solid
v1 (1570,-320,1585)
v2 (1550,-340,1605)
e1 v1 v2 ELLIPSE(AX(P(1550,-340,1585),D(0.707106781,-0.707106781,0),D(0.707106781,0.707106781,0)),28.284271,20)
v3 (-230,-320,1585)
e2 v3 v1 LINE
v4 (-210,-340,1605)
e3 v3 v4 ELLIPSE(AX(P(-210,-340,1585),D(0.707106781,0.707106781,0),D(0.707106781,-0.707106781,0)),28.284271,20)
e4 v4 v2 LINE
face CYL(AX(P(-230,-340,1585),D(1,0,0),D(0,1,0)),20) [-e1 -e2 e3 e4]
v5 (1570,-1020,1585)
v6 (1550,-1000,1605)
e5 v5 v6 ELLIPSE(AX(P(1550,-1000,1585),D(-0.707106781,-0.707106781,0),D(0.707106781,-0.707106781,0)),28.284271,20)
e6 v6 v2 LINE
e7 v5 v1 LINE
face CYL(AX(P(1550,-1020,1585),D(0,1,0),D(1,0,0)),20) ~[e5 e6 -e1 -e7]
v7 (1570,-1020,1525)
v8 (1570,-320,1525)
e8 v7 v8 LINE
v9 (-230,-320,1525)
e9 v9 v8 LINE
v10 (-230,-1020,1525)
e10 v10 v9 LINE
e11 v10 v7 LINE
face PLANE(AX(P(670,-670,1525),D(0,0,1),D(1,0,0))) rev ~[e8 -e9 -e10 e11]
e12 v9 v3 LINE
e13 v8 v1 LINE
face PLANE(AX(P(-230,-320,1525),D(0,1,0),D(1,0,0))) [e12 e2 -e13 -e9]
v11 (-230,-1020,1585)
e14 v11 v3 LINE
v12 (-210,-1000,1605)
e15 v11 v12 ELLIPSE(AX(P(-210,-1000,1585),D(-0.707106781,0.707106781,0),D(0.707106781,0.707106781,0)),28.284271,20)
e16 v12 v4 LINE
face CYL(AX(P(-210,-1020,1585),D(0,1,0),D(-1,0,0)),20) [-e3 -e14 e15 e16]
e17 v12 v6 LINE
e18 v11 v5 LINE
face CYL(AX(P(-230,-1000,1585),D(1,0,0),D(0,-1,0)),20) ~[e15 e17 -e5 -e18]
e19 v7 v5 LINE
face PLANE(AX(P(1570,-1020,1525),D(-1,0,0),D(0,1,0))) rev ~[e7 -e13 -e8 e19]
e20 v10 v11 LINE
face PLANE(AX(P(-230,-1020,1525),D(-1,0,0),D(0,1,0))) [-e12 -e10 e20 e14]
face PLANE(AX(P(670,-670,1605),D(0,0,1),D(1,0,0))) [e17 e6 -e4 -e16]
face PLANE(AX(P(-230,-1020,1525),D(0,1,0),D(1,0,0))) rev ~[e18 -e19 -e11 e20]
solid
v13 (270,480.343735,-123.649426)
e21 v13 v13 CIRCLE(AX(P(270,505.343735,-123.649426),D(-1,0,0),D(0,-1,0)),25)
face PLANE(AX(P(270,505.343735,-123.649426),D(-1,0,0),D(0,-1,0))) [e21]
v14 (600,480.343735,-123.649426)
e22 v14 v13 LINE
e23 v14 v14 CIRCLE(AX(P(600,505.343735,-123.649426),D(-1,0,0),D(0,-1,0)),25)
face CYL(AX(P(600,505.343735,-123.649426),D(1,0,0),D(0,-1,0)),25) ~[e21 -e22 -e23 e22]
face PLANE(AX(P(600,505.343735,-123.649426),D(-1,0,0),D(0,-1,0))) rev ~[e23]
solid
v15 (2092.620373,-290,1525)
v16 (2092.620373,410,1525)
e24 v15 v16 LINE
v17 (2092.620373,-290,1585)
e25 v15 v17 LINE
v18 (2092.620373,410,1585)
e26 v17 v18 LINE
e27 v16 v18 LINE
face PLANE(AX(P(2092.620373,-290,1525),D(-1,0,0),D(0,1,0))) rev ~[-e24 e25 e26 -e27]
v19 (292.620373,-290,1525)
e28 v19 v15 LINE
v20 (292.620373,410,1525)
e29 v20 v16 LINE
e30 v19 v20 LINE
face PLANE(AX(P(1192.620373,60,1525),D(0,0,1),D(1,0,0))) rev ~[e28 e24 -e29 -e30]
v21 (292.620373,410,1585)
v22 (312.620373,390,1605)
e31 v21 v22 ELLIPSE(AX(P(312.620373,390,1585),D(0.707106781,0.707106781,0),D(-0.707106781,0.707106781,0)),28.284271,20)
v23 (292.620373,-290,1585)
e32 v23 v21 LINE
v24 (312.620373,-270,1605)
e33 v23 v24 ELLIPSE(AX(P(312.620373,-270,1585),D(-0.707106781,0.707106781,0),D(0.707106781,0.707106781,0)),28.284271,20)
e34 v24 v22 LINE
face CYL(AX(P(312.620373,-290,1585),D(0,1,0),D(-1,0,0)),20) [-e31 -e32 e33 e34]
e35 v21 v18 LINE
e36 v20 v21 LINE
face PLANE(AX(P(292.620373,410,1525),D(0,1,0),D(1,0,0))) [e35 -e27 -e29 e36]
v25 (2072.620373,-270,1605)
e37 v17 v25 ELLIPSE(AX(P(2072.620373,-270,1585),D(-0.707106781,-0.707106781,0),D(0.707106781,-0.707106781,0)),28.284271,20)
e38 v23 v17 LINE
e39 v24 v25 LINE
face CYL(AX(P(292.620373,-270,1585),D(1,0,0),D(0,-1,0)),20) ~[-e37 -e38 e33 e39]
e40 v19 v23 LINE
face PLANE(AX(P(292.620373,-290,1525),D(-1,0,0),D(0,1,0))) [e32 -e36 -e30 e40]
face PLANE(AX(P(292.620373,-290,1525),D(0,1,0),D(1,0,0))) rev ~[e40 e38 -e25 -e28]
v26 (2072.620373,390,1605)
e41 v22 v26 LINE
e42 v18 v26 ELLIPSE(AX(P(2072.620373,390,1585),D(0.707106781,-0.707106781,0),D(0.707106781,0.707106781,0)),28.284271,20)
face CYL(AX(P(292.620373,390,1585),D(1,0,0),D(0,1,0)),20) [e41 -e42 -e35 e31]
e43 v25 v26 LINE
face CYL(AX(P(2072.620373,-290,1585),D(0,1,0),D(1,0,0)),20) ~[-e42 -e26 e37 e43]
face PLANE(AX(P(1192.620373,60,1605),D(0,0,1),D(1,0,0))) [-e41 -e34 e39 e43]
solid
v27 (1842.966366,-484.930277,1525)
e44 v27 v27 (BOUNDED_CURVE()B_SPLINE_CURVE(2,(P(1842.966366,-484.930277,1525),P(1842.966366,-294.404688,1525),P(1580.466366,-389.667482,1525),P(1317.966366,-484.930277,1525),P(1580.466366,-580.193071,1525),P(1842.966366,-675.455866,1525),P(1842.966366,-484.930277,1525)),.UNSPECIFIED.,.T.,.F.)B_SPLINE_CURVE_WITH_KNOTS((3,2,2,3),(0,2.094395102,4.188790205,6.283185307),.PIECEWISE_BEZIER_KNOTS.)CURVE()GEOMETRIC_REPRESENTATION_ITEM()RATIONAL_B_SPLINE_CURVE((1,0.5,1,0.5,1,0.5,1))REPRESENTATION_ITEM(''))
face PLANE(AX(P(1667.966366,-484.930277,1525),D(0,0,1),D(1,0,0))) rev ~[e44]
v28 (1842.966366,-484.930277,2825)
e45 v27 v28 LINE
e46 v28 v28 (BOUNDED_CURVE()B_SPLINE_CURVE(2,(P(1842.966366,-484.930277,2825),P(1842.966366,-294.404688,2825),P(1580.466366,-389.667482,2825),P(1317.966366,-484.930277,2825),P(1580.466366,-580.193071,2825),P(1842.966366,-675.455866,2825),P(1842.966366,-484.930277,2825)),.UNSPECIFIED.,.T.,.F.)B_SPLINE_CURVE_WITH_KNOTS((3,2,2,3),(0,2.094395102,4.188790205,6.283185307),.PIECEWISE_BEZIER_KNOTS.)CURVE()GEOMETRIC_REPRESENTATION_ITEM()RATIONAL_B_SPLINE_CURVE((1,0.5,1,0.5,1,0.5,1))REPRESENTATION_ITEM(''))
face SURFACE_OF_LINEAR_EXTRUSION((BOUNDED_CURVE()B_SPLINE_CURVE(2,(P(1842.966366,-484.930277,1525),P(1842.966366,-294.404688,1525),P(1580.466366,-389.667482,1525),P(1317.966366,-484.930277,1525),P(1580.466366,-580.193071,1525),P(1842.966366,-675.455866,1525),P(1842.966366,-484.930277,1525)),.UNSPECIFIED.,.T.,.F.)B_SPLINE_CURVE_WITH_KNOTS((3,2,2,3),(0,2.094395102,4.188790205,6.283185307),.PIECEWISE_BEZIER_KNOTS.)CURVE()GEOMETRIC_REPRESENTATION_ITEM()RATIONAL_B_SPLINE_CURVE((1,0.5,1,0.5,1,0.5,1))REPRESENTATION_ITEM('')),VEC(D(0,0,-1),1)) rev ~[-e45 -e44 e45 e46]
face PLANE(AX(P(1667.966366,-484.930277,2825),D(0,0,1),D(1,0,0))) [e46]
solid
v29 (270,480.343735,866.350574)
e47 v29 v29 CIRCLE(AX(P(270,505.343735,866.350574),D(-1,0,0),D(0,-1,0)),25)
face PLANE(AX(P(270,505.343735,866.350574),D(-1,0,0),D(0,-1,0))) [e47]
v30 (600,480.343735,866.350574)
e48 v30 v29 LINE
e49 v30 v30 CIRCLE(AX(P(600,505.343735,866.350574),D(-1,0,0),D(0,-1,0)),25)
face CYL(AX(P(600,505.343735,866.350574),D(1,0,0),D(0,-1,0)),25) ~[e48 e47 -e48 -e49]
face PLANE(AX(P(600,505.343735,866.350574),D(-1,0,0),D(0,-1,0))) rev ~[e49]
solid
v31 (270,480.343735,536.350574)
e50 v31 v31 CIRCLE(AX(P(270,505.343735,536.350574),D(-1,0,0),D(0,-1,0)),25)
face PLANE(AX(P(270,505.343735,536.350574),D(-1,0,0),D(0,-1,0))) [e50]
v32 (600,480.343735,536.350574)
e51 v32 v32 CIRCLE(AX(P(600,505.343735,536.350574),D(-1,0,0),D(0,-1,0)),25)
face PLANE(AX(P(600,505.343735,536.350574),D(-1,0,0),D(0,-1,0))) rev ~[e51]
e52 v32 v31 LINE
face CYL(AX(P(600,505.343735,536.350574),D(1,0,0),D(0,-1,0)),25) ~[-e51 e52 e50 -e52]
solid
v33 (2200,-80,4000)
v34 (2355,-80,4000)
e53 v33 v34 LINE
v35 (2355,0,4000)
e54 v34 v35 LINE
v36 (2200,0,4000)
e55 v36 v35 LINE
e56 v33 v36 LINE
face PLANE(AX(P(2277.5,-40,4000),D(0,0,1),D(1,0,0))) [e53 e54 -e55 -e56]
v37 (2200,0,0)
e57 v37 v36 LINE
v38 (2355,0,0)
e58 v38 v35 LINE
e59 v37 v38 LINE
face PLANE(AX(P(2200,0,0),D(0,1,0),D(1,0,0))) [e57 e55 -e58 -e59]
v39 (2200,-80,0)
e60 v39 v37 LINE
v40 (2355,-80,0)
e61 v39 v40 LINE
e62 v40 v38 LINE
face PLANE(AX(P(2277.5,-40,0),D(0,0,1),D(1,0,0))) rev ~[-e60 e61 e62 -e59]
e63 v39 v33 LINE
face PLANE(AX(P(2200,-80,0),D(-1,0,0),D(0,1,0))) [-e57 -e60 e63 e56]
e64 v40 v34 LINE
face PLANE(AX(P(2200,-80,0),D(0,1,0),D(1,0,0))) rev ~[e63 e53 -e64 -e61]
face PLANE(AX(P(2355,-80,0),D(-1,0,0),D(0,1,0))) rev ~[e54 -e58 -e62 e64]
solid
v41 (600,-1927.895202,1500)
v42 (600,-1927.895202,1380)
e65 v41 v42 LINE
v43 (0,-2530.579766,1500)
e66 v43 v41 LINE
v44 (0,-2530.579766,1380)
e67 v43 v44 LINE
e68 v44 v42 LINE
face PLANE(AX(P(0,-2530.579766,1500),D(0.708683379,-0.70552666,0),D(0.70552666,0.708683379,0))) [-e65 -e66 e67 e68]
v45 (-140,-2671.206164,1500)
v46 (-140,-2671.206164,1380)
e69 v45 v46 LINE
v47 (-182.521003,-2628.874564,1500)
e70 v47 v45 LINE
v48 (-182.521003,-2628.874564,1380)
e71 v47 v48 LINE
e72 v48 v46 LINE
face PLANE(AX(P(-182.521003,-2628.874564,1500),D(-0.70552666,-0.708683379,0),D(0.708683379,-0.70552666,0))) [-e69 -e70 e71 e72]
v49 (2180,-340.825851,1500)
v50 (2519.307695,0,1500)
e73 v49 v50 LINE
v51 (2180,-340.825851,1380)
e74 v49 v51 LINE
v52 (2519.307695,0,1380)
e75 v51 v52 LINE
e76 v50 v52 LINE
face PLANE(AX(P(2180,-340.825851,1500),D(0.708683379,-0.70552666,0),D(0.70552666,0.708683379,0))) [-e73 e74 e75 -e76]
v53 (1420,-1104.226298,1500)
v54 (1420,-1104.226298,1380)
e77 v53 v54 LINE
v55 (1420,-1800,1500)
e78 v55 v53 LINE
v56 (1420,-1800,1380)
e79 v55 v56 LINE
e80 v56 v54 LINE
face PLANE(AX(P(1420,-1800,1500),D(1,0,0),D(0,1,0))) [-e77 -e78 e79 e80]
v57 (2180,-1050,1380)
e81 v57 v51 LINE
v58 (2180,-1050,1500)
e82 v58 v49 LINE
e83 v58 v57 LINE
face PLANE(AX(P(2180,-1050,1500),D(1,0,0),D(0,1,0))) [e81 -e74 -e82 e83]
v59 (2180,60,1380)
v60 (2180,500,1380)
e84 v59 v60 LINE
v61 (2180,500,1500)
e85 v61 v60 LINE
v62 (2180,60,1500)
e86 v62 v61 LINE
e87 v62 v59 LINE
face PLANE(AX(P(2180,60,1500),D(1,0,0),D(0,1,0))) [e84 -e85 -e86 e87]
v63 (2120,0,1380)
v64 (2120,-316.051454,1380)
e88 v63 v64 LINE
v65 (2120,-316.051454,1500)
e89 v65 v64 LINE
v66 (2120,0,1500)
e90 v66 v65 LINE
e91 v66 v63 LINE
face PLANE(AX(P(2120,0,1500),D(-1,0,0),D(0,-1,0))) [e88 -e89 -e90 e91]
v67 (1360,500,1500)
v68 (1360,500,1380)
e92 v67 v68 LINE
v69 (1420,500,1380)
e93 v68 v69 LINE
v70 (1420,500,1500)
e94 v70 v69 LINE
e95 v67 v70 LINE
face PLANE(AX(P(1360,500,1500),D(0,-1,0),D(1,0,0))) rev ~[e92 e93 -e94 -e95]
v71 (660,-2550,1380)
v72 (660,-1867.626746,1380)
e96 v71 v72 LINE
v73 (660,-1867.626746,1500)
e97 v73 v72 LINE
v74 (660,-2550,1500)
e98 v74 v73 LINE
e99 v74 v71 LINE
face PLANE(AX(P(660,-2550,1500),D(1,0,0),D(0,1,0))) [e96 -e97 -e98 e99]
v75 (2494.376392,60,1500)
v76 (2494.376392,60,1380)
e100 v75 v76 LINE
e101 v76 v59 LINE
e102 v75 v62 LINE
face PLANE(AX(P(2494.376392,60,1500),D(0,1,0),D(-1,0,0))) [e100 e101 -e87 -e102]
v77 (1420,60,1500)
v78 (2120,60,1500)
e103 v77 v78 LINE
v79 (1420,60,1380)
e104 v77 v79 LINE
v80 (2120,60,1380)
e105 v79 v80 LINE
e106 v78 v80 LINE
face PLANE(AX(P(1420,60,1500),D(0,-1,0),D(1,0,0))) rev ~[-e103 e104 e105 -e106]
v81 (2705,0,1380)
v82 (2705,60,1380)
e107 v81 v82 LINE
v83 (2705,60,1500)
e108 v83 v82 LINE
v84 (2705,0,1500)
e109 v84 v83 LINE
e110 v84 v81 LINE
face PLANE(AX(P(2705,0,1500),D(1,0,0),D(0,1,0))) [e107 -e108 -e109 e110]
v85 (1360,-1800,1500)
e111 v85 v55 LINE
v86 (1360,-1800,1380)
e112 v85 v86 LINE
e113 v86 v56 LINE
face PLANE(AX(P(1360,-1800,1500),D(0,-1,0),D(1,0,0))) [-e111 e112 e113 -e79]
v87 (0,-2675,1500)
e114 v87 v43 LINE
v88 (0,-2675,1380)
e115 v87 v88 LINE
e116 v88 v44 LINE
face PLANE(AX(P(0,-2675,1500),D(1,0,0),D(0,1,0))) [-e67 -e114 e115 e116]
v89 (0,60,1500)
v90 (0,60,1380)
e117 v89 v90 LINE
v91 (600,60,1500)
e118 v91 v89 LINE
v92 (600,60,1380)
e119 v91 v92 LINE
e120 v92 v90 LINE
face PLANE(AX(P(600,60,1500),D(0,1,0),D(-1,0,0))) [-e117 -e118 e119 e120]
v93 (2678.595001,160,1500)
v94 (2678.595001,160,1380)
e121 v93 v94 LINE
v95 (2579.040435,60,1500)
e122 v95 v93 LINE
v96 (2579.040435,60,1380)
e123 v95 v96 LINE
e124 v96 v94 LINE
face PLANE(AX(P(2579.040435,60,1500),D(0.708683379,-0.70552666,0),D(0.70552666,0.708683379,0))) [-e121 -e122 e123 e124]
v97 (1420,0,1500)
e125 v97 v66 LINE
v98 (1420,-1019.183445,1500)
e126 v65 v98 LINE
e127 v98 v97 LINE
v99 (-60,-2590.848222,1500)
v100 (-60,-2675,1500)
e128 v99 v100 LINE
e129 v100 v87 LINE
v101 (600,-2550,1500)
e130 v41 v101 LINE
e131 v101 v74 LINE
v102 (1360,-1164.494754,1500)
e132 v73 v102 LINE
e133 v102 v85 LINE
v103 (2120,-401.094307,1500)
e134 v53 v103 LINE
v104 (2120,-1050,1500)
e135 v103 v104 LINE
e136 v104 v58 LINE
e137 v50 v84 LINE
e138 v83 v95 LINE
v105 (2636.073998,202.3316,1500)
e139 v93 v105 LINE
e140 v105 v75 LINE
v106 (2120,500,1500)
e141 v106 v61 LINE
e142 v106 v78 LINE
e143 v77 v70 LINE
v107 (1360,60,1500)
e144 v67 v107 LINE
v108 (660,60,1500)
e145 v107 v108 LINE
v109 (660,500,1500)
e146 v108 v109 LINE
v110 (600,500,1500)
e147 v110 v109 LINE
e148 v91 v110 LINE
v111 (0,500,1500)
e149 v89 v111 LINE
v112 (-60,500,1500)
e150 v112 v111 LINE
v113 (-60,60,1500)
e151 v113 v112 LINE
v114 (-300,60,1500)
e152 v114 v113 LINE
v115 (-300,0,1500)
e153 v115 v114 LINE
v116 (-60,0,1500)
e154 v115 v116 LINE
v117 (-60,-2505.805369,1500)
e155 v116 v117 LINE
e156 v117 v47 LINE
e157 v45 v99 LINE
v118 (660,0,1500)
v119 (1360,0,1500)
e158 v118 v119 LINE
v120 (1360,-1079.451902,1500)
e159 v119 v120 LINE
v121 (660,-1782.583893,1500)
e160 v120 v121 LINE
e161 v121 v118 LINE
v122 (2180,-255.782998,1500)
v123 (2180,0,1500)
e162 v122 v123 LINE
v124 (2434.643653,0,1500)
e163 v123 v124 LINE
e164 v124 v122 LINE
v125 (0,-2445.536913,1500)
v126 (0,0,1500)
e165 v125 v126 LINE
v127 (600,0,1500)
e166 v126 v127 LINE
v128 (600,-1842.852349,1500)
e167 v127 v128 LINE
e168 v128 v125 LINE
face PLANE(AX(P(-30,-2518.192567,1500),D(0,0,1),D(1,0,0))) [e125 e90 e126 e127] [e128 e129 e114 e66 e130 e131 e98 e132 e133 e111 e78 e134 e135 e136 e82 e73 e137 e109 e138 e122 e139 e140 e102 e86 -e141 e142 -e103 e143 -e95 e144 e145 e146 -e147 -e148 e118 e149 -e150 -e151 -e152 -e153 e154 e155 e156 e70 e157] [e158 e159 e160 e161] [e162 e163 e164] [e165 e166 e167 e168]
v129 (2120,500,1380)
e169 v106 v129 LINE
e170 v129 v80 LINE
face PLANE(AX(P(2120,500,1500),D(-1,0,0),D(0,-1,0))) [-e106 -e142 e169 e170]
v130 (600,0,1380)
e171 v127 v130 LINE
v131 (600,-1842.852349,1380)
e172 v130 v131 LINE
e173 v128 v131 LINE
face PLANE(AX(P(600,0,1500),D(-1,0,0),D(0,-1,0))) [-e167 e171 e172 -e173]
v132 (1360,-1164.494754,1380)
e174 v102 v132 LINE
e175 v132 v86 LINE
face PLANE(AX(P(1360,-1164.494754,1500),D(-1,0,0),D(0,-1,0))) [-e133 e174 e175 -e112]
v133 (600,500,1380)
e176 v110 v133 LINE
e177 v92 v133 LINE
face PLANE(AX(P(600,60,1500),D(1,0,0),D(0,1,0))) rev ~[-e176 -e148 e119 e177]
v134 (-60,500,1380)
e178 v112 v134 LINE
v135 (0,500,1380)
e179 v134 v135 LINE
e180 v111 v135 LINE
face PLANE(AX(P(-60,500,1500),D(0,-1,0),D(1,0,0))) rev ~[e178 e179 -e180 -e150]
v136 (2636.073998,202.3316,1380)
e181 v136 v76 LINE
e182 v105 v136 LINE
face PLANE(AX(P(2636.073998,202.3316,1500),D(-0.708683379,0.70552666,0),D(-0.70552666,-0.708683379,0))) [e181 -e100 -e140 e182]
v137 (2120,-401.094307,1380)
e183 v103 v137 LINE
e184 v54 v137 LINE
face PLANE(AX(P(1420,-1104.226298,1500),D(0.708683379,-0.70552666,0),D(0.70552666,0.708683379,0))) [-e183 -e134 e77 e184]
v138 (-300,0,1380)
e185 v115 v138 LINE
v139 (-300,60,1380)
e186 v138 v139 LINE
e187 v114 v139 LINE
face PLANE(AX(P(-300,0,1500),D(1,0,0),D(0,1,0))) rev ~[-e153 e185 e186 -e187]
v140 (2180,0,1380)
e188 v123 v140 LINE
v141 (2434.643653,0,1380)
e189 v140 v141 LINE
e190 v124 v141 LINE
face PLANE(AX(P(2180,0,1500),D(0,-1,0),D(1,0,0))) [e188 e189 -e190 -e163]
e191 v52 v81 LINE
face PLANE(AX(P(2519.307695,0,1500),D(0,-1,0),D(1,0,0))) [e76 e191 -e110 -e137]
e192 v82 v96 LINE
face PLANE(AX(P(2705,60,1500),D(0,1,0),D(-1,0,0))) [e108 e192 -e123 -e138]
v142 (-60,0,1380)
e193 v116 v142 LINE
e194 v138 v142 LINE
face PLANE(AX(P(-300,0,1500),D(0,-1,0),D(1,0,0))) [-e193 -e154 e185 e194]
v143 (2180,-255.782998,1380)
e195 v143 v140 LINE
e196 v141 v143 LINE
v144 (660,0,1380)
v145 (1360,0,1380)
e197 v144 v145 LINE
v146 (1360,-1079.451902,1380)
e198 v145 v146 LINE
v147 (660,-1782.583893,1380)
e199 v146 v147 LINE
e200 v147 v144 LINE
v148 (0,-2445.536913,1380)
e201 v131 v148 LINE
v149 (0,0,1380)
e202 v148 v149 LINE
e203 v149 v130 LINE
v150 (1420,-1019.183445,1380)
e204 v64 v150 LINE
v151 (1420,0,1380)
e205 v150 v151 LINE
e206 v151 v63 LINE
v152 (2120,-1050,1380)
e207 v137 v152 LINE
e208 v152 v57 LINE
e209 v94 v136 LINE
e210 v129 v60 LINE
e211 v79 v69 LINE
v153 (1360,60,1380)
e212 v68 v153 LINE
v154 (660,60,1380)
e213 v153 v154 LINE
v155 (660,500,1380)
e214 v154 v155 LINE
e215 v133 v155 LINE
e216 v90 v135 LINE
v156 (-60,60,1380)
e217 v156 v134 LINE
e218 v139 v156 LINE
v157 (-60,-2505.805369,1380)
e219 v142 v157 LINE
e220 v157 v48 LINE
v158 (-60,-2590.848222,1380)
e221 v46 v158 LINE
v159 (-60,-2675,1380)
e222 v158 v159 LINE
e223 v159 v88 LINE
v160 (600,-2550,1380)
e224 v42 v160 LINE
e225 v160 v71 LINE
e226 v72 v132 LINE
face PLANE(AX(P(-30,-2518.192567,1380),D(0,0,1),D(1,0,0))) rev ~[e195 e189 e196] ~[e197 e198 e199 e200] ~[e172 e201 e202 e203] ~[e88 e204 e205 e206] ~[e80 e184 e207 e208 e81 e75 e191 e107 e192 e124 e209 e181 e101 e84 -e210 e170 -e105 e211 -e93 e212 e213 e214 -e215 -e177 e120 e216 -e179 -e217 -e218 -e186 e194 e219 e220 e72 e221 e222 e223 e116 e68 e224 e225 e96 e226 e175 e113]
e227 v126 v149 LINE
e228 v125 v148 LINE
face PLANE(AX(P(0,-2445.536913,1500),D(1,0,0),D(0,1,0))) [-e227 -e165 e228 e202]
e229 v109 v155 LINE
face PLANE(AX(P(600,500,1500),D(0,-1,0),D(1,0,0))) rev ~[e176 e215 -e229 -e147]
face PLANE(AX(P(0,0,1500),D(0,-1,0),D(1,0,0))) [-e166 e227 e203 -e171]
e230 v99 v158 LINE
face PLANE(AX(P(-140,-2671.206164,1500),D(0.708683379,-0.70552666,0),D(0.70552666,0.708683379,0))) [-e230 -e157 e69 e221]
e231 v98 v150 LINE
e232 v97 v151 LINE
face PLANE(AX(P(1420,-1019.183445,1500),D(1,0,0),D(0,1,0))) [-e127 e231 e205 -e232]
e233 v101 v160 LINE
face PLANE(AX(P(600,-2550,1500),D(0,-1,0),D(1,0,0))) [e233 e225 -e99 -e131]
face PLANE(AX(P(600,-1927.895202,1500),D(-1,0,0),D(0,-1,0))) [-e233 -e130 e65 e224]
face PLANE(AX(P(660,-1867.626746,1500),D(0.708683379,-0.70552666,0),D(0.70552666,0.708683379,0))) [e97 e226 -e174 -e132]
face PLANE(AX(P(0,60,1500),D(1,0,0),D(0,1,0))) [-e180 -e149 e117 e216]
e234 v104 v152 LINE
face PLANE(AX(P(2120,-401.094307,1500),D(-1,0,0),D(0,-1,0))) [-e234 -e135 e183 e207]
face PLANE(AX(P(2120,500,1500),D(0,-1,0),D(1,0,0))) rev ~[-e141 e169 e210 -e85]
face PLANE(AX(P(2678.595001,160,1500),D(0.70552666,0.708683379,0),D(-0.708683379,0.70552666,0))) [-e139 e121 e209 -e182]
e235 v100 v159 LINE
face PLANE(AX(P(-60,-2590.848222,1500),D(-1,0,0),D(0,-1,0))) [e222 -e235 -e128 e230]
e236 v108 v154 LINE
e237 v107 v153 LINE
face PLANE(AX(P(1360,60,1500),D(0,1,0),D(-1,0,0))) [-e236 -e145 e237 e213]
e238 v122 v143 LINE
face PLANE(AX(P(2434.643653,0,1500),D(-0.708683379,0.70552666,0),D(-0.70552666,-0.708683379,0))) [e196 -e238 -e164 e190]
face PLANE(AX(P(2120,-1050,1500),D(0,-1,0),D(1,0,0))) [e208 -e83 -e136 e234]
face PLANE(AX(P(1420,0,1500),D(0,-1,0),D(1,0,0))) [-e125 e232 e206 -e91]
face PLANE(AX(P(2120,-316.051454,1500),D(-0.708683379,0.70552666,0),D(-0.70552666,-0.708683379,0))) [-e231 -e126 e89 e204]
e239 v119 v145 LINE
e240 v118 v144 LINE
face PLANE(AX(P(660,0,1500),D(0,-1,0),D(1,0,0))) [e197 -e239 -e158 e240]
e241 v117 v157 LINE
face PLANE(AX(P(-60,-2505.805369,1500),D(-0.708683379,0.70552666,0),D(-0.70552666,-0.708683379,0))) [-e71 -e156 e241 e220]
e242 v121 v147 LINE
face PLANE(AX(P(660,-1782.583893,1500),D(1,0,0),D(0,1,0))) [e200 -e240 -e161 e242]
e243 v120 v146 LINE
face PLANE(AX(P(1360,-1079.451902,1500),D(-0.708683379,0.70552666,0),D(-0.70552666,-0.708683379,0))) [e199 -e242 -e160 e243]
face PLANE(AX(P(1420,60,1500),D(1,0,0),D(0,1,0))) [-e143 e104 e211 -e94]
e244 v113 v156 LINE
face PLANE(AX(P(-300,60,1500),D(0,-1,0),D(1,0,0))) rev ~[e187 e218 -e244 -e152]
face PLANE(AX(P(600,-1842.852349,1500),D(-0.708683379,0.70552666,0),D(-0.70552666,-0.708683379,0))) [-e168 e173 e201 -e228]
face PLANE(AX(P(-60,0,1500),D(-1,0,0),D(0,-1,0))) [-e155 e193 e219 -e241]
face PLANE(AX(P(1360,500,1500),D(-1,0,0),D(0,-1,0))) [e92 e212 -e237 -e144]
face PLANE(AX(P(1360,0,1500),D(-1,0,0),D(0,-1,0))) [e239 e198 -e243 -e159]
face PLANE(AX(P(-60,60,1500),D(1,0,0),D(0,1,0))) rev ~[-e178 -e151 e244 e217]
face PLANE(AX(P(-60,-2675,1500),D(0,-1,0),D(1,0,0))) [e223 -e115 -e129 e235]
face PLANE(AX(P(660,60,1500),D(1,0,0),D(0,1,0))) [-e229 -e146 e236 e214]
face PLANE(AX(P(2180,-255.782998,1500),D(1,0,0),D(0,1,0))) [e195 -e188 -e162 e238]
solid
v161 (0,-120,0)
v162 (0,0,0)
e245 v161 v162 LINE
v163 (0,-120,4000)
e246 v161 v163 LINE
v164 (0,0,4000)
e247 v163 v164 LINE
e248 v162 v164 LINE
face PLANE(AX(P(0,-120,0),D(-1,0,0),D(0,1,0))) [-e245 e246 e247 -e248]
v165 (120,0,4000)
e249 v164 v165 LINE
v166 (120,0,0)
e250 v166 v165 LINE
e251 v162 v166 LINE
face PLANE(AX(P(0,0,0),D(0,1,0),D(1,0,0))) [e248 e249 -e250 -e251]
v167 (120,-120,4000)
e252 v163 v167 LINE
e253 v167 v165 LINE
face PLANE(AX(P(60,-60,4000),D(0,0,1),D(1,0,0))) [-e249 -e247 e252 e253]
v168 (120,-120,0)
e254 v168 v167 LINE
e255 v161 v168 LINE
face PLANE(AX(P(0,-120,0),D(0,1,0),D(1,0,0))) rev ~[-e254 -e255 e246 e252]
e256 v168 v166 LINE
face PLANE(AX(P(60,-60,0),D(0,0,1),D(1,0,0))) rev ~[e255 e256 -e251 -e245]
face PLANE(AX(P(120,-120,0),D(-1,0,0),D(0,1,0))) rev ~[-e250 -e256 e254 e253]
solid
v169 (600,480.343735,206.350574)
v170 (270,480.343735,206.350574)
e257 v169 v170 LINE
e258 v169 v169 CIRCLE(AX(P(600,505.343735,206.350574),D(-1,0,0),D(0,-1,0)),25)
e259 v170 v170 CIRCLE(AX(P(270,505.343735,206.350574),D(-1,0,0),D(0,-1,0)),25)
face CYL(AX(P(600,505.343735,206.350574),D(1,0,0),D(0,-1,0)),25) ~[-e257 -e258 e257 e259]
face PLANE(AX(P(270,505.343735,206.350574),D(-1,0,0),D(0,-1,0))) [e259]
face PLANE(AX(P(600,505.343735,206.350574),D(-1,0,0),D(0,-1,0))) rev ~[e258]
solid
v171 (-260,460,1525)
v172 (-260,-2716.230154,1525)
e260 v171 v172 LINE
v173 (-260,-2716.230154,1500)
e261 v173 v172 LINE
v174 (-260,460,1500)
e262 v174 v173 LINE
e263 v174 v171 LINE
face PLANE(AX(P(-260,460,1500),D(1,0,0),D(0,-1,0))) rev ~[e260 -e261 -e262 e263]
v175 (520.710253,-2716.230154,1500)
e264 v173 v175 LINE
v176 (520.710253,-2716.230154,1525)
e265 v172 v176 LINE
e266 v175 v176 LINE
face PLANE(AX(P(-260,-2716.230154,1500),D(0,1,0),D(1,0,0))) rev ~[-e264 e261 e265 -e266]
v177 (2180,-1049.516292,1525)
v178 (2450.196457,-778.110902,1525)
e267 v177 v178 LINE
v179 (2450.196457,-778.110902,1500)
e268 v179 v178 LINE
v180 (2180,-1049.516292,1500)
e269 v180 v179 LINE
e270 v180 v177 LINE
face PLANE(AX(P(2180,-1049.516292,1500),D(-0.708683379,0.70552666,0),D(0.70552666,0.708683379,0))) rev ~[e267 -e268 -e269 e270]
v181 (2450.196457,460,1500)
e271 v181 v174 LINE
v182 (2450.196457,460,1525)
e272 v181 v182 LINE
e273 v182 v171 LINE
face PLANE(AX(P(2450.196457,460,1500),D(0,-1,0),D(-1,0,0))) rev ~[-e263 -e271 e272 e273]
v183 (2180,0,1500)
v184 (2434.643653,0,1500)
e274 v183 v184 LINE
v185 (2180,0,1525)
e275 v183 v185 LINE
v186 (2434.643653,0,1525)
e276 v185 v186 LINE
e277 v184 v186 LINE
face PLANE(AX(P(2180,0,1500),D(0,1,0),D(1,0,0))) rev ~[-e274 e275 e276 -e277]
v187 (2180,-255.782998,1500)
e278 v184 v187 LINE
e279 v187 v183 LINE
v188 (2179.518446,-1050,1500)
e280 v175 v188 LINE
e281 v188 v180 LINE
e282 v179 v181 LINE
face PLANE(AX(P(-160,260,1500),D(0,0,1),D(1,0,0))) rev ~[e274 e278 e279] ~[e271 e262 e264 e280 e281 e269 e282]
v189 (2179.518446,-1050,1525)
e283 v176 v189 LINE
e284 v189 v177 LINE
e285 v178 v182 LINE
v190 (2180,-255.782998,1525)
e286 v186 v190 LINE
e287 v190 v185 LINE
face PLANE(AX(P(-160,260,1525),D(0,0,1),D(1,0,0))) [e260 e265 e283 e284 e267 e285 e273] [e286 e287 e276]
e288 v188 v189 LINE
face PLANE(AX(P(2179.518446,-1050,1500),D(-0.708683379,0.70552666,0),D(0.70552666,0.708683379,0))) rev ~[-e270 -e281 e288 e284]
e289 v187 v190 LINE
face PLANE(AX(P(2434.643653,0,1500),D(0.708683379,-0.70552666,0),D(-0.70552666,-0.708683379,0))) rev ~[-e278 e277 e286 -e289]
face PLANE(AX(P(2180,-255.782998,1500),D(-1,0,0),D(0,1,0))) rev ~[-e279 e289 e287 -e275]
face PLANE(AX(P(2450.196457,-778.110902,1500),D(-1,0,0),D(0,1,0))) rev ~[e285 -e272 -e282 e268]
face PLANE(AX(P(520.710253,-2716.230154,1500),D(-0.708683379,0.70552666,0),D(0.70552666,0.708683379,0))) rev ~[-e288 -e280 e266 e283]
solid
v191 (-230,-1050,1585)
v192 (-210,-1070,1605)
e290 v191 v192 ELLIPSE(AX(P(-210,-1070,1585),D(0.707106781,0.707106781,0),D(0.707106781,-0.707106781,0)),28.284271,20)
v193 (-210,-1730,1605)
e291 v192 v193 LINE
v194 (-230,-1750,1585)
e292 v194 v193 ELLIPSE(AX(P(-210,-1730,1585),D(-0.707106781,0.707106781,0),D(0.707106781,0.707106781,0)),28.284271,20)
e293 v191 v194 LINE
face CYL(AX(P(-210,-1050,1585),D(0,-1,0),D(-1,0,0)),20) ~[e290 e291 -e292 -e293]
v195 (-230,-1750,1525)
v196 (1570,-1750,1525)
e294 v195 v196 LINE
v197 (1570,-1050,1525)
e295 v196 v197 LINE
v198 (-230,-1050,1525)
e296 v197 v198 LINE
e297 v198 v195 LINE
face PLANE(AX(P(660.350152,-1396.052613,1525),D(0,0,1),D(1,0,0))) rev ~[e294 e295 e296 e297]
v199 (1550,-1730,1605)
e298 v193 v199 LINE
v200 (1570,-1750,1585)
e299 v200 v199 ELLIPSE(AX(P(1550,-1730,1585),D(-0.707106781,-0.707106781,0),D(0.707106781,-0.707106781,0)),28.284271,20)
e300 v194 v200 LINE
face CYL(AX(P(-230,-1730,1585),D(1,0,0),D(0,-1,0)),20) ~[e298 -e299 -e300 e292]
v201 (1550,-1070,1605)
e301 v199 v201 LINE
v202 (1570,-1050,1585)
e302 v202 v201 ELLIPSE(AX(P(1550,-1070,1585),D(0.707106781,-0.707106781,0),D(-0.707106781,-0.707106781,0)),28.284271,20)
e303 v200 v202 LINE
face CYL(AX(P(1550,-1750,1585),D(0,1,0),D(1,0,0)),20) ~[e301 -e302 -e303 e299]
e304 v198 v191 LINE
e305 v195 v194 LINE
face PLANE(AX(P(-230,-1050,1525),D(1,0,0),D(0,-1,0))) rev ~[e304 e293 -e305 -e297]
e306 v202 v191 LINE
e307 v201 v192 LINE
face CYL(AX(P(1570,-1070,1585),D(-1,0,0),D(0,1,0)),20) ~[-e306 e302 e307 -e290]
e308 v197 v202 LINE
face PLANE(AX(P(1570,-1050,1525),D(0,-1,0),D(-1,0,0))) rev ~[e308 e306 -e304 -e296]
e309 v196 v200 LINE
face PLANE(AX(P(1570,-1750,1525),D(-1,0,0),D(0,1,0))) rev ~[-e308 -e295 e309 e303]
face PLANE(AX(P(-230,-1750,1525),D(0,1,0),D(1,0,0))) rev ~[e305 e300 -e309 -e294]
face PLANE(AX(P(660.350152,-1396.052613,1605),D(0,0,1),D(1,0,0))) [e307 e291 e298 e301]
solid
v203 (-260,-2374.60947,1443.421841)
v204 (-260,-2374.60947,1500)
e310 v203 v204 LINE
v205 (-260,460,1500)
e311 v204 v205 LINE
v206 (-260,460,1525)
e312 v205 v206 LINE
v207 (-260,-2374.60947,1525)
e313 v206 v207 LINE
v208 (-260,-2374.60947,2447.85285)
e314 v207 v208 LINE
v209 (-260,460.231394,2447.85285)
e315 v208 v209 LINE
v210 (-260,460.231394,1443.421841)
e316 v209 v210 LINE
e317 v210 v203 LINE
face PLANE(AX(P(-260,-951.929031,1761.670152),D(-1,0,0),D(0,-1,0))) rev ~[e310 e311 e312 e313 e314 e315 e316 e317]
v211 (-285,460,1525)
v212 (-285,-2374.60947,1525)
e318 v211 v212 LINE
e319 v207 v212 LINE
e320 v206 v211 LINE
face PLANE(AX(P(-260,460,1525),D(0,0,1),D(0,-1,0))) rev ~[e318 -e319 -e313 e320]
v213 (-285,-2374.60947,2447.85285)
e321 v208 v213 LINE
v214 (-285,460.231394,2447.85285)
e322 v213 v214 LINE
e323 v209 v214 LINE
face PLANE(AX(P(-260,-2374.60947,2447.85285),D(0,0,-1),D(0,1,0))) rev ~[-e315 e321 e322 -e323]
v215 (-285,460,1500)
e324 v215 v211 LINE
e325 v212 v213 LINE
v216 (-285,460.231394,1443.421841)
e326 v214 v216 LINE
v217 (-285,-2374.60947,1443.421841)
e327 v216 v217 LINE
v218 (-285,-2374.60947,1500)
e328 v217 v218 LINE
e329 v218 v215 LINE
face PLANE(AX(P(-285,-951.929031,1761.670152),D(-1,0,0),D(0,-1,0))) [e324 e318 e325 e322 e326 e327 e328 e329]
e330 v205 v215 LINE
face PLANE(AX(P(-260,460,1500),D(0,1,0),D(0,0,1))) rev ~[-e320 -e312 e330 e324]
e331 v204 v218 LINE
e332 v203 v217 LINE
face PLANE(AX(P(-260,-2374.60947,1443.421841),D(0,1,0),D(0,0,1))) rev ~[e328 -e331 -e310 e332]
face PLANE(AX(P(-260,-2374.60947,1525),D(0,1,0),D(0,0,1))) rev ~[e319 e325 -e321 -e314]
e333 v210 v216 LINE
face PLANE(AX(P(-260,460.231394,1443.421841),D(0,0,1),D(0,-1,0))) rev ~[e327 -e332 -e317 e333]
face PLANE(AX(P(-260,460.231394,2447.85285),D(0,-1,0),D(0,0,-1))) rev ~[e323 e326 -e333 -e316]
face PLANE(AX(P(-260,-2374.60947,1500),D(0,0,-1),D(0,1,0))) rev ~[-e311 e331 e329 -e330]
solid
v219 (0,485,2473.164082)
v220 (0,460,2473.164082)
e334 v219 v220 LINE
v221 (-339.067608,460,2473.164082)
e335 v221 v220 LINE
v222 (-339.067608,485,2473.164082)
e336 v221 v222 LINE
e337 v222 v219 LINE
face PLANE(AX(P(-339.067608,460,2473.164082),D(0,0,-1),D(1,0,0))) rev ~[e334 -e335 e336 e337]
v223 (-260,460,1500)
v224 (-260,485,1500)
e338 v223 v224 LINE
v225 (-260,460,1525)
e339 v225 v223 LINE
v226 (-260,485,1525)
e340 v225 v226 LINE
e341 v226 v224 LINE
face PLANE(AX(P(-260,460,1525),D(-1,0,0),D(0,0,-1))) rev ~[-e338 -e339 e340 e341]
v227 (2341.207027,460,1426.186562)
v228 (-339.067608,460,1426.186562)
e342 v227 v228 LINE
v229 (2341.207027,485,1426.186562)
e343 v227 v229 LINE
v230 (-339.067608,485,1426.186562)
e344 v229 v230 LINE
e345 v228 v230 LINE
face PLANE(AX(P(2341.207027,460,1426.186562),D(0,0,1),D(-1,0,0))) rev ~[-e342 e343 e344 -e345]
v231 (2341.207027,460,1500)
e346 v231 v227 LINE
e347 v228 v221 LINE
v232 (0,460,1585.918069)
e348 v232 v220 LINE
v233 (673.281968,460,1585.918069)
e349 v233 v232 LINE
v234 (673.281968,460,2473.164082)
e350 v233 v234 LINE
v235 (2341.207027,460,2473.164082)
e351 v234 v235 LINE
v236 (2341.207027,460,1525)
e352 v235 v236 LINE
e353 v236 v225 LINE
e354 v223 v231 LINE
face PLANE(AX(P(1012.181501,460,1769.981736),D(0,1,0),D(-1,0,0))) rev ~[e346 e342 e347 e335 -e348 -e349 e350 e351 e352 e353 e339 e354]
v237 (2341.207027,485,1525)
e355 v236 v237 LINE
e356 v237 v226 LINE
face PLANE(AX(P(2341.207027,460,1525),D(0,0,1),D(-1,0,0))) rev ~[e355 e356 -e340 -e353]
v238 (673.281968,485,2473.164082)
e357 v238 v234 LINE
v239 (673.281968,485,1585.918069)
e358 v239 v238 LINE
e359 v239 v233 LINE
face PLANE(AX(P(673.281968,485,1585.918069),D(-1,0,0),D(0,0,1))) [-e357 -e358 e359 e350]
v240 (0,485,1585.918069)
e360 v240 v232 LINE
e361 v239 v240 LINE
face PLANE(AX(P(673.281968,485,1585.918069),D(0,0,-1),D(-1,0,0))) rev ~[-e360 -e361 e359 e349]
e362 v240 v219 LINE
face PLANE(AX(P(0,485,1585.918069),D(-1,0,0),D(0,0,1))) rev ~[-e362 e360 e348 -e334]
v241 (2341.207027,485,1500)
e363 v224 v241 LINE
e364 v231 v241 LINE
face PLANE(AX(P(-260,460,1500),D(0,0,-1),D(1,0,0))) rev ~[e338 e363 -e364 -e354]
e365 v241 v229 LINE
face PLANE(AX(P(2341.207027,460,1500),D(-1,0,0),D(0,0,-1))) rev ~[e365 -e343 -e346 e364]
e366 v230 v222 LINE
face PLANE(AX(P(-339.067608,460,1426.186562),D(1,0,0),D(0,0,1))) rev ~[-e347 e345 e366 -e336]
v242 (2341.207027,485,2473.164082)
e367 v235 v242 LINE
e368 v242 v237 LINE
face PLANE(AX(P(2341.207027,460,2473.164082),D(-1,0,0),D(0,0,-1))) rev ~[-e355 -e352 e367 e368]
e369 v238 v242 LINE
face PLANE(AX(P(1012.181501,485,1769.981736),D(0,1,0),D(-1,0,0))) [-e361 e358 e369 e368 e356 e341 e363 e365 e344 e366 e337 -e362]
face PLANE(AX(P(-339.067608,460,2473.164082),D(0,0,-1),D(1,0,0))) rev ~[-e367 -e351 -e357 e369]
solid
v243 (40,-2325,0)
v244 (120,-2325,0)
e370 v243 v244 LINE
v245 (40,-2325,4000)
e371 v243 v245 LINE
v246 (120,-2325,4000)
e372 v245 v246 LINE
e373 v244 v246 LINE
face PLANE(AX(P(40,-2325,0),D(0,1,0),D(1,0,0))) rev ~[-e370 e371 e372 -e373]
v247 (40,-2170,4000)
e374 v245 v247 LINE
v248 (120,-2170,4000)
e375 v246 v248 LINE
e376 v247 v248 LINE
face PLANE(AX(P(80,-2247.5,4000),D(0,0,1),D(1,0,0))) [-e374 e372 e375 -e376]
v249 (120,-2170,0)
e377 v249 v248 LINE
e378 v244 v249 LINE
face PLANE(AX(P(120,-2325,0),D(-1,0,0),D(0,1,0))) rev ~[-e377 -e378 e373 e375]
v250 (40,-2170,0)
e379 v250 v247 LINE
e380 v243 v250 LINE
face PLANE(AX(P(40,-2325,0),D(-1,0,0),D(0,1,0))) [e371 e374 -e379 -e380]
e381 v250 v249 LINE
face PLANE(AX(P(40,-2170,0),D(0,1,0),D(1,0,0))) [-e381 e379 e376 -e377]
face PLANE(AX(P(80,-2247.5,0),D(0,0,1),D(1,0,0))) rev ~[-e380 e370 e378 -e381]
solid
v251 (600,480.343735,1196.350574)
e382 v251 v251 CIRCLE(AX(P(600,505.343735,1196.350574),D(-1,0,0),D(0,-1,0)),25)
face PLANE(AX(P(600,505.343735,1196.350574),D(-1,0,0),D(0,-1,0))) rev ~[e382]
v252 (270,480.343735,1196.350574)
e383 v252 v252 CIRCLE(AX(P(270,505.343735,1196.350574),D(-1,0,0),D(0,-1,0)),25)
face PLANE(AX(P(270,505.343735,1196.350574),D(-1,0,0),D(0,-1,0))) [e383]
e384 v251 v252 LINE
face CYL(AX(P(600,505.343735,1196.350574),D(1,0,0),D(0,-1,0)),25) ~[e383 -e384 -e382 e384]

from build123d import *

# Parameters (mm, degrees)
F0_W      = 80
F0_H      = 155
F1_DEPTH  = 4000
F0_W_2    = 120
F0_H_2    = 120
F0_W_3    = 155
F0_H_3    = 80
F3_W      = 600
F3_H      = 60
F3_W_2    = 60
F3_H_2    = 440
F3_W_3    = 240
F3_W_4    = 700
F4_DEPTH  = 120
F5_W      = 200
F5_H      = 400
F5_W_2    = 270.1964569092
F5_W_3    = 700
F5_W_4    = 600
F6_DEPTH  = 25
F7_W      = 1800
F7_H      = 700
F8_DEPTH  = 80
F9_R      = 20
F9_2_R    = 20
F9_3_R    = 20
F13_DEPTH = 1300
F15_DEPTH = 25
F17_DEPTH = 25
F21_W     = 673.2819676399
F21_H     = 887.2460126877
F22_DEPTH = 25
F23_R     = 25
F24_DEPTH = 330


# Not quite as in the source:
# - a feature names something its author has since deleted; it is built from what else it names


with BuildPart() as f1:
    # F0 (on Top) → F1 (new body)
    with BuildSketch(Plane.XY):
        with Locations((80, -2247.5)):
            Rectangle(F0_W, F0_H)
    extrude(amount=F1_DEPTH)


with BuildPart() as f1b:
    # F0 (on Top) → F1, piece 2 (new body)
    with BuildSketch(Plane.XY):
        with Locations((60, -60)):
            Rectangle(F0_W_2, F0_H_2)
    extrude(amount=F1_DEPTH)


with BuildPart() as f1c:
    # F0 (on Top) → F1, piece 3 (new body)
    with BuildSketch(Plane.XY):
        with Locations((2277.5, -40)):
            Rectangle(F0_W_3, F0_H_3)
    extrude(amount=F1_DEPTH)


with BuildPart() as f4:
    # F3 (on offset) → F4 (new body)
    with BuildSketch(Plane.XY.offset(1500)):
        Polygon((-60, -2590.8482220543), (0, -2530.5797656785), (0, -2445.5369127517), (-60, -2505.8053691275), align=None)
        Polygon((-60, -2675), (0, -2675), (0, -2530.5797656785), (-60, -2590.8482220543), align=None)
        Polygon((-140, -2671.2061638888), (-60, -2590.8482220543), (-60, -2505.8053691275), (-182.5210027427, -2628.8745642763), align=None)
        Polygon((0, -2445.5369127517), (0, -2530.5797656785), (600, -1927.8952019201), (600, -1842.8523489933), align=None)
        Polygon((-60, -2505.8053691275), (0, -2445.5369127517), (0, 0), (-60, 0), align=None)
        with Locations((300, 30)):
            Rectangle(F3_W, F3_H)
        Polygon((2579.0404348737, 60), (2519.3076954527, 0), (2705, 0), (2705, 60), align=None)
        Polygon((2494.3763919822, 60), (2579.0404348737, 60), (2678.5950005752, 160), (2636.0739978325, 202.3315996125), align=None)
        Polygon((2434.6436525612, 0), (2519.3076954527, 0), (2579.0404348737, 60), (2494.3763919822, 60), align=None)
        with Locations((-30, 280)):
            Rectangle(F3_W_2, F3_H_2)
        with Locations((-180, 30)):
            Rectangle(F3_W_3, F3_H)
        with Locations((-30, 30)):
            Rectangle(F3_W_2, F3_H)
        Polygon((600, 0), (600, -1842.8523489933), (660, -1782.5838926174), (660, 0), align=None)
        Polygon((660, -1867.6267455442), (600, -1927.8952019201), (600, -2550), (660, -2550), align=None)
        Polygon((1420, -1104.2262981169), (1360, -1164.4947544928), (1360, -1800), (1420, -1800), align=None)
        Polygon((1360, 0), (1360, -1079.451901566), (1420, -1019.1834451902), (1420, 0), align=None)
        Polygon((660, -1782.5838926174), (660, -1867.6267455442), (1360, -1164.4947544928), (1360, -1079.451901566), align=None)
        Polygon((1420, -1019.1834451902), (1420, -1104.2262981169), (2120, -401.0943070655), (2120, -316.0514541387), align=None)
        Polygon((2180, -340.8258506896), (2120, -401.0943070655), (2120, -1050), (2180, -1050), align=None)
        Polygon((600, -1842.8523489933), (600, -1927.8952019201), (660, -1867.6267455442), (660, -1782.5838926174), align=None)
        Polygon((1360, -1079.451901566), (1360, -1164.4947544928), (1420, -1104.2262981169), (1420, -1019.1834451902), align=None)
        Polygon((2120, -316.0514541387), (2120, -401.0943070655), (2180, -340.8258506896), (2180, -255.7829977629), align=None)
        Polygon((2180, -255.7829977629), (2180, -340.8258506896), (2519.3076954527, 0), (2434.6436525612, 0), align=None)
        Polygon((2180, 60), (2180, 0), (2434.6436525612, 0), (2494.3763919822, 60), align=None)
        with Locations((2150, 30)):
            Rectangle(F3_W_2, F3_H)
        Polygon((2120, 0), (2120, -316.0514541387), (2180, -255.7829977629), (2180, 0), align=None)
        with Locations((2150, 280)):
            Rectangle(F3_W_2, F3_H_2)
        with Locations((1390, 280)):
            Rectangle(F3_W_2, F3_H_2)
        with Locations((1390, 30)):
            Rectangle(F3_W_2, F3_H)
        with Locations((1010, 30)):
            Rectangle(F3_W_4, F3_H)
        with Locations((630, 30)):
            Rectangle(F3_W_2, F3_H)
        with Locations((630, 280)):
            Rectangle(F3_W_2, F3_H_2)
        with Locations((1770, 30)):
            Rectangle(F3_W_4, F3_H)
    extrude(amount=-F4_DEPTH)


with BuildPart() as f6:
    # F5 (on face) → F6 (new body)
    with BuildSketch(Plane.XY.offset(1500)):
        with Locations((-160, 260)):
            Rectangle(F5_W, F5_H)
        Polygon((-60, 60), (-260, 60), (-260, 0), (-60, 0), (-60, -2505.8053691275), (-182.5210027427, -2628.8745642763), (-140, -2671.2061638888), (-60, -2590.8482220543), (-60, -2675), (0, -2675), (0, -2530.5797656785), (600, -1927.8952019201), (600, -2550), (660, -2550), (660, -1867.6267455442), (1360, -1164.4947544928), (1360, -1800), (1420, -1800), (1420, -1104.2262981169), (2120, -401.0943070655), (2120, -1050), (2179.5184463486, -1050), (2180, -1049.5162917462), (2180, -340.8258506896), (2450.1964569092, -69.4204610874), (2450.1964569092, 60), (2180, 60), (2180, 460), (2120, 460), (2120, 60), (1420, 60), (1420, 460), (1360, 460), (1360, 60), (660, 60), (660, 460), (600, 460), (600, 60), (0, 60), (0, 460), (-60, 460), align=None)
        Polygon((0, -2445.5369127517), (0, 0), (600, 0), (600, -1842.8523489933), align=None, mode=Mode.SUBTRACT)
        Polygon((1360, -1079.451901566), (660, -1782.5838926174), (660, 0), (1360, 0), align=None, mode=Mode.SUBTRACT)
        Polygon((1420, 0), (2120, 0), (2120, -316.0514541387), (1420, -1019.1834451902), align=None, mode=Mode.SUBTRACT)
        Polygon((2180, 0), (2434.6436525612, 0), (2180, -255.7829977629), align=None, mode=Mode.SUBTRACT)
        with Locations((2315.0982284546, 260)):
            Rectangle(F5_W_2, F5_H)
        Polygon((-60, 0), (-260, 0), (-260, -2716.2301540375), (520.7102529082, -2716.2301540375), (2179.5184463486, -1050), (2120, -1050), (2120, -401.0943070655), (1420, -1104.2262981169), (1420, -1800), (1360, -1800), (1360, -1164.4947544928), (660, -1867.6267455442), (660, -2550), (600, -2550), (600, -1927.8952019201), (0, -2530.5797656785), (0, -2675), (-60, -2675), (-60, -2590.8482220543), (-140, -2671.2061638888), (-182.5210027427, -2628.8745642763), (-60, -2505.8053691275), align=None)
        Polygon((2180, -340.8258506896), (2180, -1049.5162917462), (2450.1964569092, -778.1109021439), (2450.1964569092, -69.4204610874), align=None)
        Polygon((660, 0), (660, -1782.5838926174), (1360, -1079.451901566), (1360, 0), align=None)
        Polygon((2120, -316.0514541387), (2120, 0), (1420, 0), (1420, -1019.1834451902), align=None)
        with Locations((1770, 260)):
            Rectangle(F5_W_3, F5_H)
        with Locations((1010, 260)):
            Rectangle(F5_W_3, F5_H)
        with Locations((300, 260)):
            Rectangle(F5_W_4, F5_H)
        Polygon((600, 0), (0, 0), (0, -2445.5369127517), (600, -1842.8523489933), align=None)
    extrude(amount=F6_DEPTH)


with BuildPart() as f8:
    # F7 (on face) → F8 (new body)
    with BuildSketch(Plane.XY.offset(1525)):
        with Locations((1192.6203727722, 60)):
            Rectangle(F7_W, F7_H)
    extrude(amount=F8_DEPTH)

    # F9#3
    f9_3_edges = [f8.edges().sort_by_distance(p)[0] for p in [
        (1192.620373, -290, 1605),
        (292.620373, 60, 1605),
        (1192.620373, 410, 1605),
        (2092.620373, 60, 1605),
    ]]
    fillet(f9_3_edges, radius=F9_3_R)


with BuildPart() as f8b:
    # F7 (on face) → F8, piece 2 (new body)
    with BuildSketch(Plane.XY.offset(1525)):
        with Locations((670, -670)):
            Rectangle(F7_W, F7_H)
    extrude(amount=F8_DEPTH)

    # F9#2
    f9_2_edges = [f8b.edges().sort_by_distance(p)[0] for p in [
        (670, -1020, 1605),
        (1570, -670, 1605),
        (670, -320, 1605),
        (-230, -670, 1605),
    ]]
    fillet(f9_2_edges, radius=F9_2_R)


with BuildPart() as f8c:
    # F7 (on face) → F8, piece 3 (new body)
    with BuildSketch(Plane.XY.offset(1525)):
        Polygon((1570, -1050), (-230, -1050), (-230, -1750), (1482.6364864377, -1750), (1570, -1662.2455982339), align=None)
        Polygon((1570, -1750), (1570, -1662.2455982339), (1482.6364864377, -1750), align=None)
    extrude(amount=F8_DEPTH)

    # F9
    f9_edges = [f8c.edges().sort_by_distance(p)[0] for p in [
        (670, -1750, 1605),
        (-230, -1400, 1605),
        (670, -1050, 1605),
        (1570, -1400, 1605),
    ]]
    fillet(f9_edges, radius=F9_R)


with BuildPart() as f13:
    # F12 (on face) → F13 (new body)
    with BuildSketch(Plane.XY.offset(1525)):
        with BuildLine():
            add(Edge.make_bspline(
                [(1842.9663658142, -484.9302768707), (1842.9663658142, -294.4046880382), (1580.4663658142, -389.6674824544), (1317.9663658142, -484.9302768707), (1580.4663658142, -580.193071287), (1842.9663658142, -675.4558657033), (1842.9663658142, -484.9302768707)],
                knots=[0, 0, 0, 2.0943951024, 2.0943951024, 4.1887902048, 4.1887902048, 6.2831853072, 6.2831853072, 6.2831853072], degree=2, weights=[1, 0.5, 1, 0.5, 1, 0.5, 1]))
        make_face()
    extrude(amount=F13_DEPTH)


with BuildPart() as f15:
    # F14 (on face) → F15 (new body)
    with BuildSketch(Plane(origin=(0, 460, 0), x_dir=(-1, 0, 0), z_dir=(0, 1, 0))):
        Polygon((-2341.2070274353, 1500), (-2341.2070274353, 1426.1865615845), (339.0676081181, 1426.1865615845), (339.0676081181, 2473.1640815735), (-2341.2070274353, 2473.1640815735), (-2341.2070274353, 1525), (260, 1525), (260, 1500), align=None)
    extrude(amount=F15_DEPTH)

    # F21 (on face) → F22 (cut)
    with BuildSketch(Plane(origin=(0, 485, 0), x_dir=(-1, 0, 0), z_dir=(0, 1, 0))):
        with Locations((-336.64098382, 2029.5410752296)):
            Rectangle(F21_W, F21_H)
    extrude(amount=-F22_DEPTH, mode=Mode.SUBTRACT)


with BuildPart() as f17:
    # F16 (on face) → F17 (new body)
    with BuildSketch(Plane(origin=(-260, 0, 0), x_dir=(0, -1, 0), z_dir=(-1, 0, 0))):
        Polygon((-460.2313935757, 2447.8528499603), (-460.2313935757, 1443.4218406677), (2374.6094703674, 1443.4218406677), (2374.6094703674, 1500), (-460, 1500), (-460, 1525), (2374.6094703674, 1525), (2374.6094703674, 2447.8528499603), align=None)
    extrude(amount=F17_DEPTH)


with BuildPart() as f24:
    # F23 (on face) → F24 (new body)
    with BuildSketch(Plane(origin=(600, 0, 0), x_dir=(0, -1, 0), z_dir=(-1, 0, 0))):
        with Locations((-505.343735218, 1196.3505744934)):
            Circle(F23_R)
    extrude(amount=F24_DEPTH)


with BuildPart() as f24b:
    # F23 (on face) → F24, piece 2 (new body)
    with BuildSketch(Plane(origin=(600, 0, 0), x_dir=(0, -1, 0), z_dir=(-1, 0, 0))):
        with Locations((-505.343735218, 866.3505744934)):
            Circle(F23_R)
    extrude(amount=F24_DEPTH)


with BuildPart() as f24c:
    # F23 (on face) → F24, piece 3 (new body)
    with BuildSketch(Plane(origin=(600, 0, 0), x_dir=(0, -1, 0), z_dir=(-1, 0, 0))):
        with Locations((-505.343735218, 536.3505744934)):
            Circle(F23_R)
    extrude(amount=F24_DEPTH)


with BuildPart() as f24d:
    # F23 (on face) → F24, piece 4 (new body)
    with BuildSketch(Plane(origin=(600, 0, 0), x_dir=(0, -1, 0), z_dir=(-1, 0, 0))):
        with Locations((-505.343735218, 206.3505744934)):
            Circle(F23_R)
    extrude(amount=F24_DEPTH)


with BuildPart() as f24e:
    # F23 (on face) → F24, piece 5 (new body)
    with BuildSketch(Plane(origin=(600, 0, 0), x_dir=(0, -1, 0), z_dir=(-1, 0, 0))):
        with Locations((-505.343735218, -123.6494255066)):
            Circle(F23_R)
    extrude(amount=F24_DEPTH)


solid = Compound([f1.part, f1b.part, f1c.part, f4.part, f6.part, f8.part, f8b.part, f8c.part, f13.part, f15.part, f17.part, f24.part, f24b.part, f24c.part, f24d.part, f24e.part])
